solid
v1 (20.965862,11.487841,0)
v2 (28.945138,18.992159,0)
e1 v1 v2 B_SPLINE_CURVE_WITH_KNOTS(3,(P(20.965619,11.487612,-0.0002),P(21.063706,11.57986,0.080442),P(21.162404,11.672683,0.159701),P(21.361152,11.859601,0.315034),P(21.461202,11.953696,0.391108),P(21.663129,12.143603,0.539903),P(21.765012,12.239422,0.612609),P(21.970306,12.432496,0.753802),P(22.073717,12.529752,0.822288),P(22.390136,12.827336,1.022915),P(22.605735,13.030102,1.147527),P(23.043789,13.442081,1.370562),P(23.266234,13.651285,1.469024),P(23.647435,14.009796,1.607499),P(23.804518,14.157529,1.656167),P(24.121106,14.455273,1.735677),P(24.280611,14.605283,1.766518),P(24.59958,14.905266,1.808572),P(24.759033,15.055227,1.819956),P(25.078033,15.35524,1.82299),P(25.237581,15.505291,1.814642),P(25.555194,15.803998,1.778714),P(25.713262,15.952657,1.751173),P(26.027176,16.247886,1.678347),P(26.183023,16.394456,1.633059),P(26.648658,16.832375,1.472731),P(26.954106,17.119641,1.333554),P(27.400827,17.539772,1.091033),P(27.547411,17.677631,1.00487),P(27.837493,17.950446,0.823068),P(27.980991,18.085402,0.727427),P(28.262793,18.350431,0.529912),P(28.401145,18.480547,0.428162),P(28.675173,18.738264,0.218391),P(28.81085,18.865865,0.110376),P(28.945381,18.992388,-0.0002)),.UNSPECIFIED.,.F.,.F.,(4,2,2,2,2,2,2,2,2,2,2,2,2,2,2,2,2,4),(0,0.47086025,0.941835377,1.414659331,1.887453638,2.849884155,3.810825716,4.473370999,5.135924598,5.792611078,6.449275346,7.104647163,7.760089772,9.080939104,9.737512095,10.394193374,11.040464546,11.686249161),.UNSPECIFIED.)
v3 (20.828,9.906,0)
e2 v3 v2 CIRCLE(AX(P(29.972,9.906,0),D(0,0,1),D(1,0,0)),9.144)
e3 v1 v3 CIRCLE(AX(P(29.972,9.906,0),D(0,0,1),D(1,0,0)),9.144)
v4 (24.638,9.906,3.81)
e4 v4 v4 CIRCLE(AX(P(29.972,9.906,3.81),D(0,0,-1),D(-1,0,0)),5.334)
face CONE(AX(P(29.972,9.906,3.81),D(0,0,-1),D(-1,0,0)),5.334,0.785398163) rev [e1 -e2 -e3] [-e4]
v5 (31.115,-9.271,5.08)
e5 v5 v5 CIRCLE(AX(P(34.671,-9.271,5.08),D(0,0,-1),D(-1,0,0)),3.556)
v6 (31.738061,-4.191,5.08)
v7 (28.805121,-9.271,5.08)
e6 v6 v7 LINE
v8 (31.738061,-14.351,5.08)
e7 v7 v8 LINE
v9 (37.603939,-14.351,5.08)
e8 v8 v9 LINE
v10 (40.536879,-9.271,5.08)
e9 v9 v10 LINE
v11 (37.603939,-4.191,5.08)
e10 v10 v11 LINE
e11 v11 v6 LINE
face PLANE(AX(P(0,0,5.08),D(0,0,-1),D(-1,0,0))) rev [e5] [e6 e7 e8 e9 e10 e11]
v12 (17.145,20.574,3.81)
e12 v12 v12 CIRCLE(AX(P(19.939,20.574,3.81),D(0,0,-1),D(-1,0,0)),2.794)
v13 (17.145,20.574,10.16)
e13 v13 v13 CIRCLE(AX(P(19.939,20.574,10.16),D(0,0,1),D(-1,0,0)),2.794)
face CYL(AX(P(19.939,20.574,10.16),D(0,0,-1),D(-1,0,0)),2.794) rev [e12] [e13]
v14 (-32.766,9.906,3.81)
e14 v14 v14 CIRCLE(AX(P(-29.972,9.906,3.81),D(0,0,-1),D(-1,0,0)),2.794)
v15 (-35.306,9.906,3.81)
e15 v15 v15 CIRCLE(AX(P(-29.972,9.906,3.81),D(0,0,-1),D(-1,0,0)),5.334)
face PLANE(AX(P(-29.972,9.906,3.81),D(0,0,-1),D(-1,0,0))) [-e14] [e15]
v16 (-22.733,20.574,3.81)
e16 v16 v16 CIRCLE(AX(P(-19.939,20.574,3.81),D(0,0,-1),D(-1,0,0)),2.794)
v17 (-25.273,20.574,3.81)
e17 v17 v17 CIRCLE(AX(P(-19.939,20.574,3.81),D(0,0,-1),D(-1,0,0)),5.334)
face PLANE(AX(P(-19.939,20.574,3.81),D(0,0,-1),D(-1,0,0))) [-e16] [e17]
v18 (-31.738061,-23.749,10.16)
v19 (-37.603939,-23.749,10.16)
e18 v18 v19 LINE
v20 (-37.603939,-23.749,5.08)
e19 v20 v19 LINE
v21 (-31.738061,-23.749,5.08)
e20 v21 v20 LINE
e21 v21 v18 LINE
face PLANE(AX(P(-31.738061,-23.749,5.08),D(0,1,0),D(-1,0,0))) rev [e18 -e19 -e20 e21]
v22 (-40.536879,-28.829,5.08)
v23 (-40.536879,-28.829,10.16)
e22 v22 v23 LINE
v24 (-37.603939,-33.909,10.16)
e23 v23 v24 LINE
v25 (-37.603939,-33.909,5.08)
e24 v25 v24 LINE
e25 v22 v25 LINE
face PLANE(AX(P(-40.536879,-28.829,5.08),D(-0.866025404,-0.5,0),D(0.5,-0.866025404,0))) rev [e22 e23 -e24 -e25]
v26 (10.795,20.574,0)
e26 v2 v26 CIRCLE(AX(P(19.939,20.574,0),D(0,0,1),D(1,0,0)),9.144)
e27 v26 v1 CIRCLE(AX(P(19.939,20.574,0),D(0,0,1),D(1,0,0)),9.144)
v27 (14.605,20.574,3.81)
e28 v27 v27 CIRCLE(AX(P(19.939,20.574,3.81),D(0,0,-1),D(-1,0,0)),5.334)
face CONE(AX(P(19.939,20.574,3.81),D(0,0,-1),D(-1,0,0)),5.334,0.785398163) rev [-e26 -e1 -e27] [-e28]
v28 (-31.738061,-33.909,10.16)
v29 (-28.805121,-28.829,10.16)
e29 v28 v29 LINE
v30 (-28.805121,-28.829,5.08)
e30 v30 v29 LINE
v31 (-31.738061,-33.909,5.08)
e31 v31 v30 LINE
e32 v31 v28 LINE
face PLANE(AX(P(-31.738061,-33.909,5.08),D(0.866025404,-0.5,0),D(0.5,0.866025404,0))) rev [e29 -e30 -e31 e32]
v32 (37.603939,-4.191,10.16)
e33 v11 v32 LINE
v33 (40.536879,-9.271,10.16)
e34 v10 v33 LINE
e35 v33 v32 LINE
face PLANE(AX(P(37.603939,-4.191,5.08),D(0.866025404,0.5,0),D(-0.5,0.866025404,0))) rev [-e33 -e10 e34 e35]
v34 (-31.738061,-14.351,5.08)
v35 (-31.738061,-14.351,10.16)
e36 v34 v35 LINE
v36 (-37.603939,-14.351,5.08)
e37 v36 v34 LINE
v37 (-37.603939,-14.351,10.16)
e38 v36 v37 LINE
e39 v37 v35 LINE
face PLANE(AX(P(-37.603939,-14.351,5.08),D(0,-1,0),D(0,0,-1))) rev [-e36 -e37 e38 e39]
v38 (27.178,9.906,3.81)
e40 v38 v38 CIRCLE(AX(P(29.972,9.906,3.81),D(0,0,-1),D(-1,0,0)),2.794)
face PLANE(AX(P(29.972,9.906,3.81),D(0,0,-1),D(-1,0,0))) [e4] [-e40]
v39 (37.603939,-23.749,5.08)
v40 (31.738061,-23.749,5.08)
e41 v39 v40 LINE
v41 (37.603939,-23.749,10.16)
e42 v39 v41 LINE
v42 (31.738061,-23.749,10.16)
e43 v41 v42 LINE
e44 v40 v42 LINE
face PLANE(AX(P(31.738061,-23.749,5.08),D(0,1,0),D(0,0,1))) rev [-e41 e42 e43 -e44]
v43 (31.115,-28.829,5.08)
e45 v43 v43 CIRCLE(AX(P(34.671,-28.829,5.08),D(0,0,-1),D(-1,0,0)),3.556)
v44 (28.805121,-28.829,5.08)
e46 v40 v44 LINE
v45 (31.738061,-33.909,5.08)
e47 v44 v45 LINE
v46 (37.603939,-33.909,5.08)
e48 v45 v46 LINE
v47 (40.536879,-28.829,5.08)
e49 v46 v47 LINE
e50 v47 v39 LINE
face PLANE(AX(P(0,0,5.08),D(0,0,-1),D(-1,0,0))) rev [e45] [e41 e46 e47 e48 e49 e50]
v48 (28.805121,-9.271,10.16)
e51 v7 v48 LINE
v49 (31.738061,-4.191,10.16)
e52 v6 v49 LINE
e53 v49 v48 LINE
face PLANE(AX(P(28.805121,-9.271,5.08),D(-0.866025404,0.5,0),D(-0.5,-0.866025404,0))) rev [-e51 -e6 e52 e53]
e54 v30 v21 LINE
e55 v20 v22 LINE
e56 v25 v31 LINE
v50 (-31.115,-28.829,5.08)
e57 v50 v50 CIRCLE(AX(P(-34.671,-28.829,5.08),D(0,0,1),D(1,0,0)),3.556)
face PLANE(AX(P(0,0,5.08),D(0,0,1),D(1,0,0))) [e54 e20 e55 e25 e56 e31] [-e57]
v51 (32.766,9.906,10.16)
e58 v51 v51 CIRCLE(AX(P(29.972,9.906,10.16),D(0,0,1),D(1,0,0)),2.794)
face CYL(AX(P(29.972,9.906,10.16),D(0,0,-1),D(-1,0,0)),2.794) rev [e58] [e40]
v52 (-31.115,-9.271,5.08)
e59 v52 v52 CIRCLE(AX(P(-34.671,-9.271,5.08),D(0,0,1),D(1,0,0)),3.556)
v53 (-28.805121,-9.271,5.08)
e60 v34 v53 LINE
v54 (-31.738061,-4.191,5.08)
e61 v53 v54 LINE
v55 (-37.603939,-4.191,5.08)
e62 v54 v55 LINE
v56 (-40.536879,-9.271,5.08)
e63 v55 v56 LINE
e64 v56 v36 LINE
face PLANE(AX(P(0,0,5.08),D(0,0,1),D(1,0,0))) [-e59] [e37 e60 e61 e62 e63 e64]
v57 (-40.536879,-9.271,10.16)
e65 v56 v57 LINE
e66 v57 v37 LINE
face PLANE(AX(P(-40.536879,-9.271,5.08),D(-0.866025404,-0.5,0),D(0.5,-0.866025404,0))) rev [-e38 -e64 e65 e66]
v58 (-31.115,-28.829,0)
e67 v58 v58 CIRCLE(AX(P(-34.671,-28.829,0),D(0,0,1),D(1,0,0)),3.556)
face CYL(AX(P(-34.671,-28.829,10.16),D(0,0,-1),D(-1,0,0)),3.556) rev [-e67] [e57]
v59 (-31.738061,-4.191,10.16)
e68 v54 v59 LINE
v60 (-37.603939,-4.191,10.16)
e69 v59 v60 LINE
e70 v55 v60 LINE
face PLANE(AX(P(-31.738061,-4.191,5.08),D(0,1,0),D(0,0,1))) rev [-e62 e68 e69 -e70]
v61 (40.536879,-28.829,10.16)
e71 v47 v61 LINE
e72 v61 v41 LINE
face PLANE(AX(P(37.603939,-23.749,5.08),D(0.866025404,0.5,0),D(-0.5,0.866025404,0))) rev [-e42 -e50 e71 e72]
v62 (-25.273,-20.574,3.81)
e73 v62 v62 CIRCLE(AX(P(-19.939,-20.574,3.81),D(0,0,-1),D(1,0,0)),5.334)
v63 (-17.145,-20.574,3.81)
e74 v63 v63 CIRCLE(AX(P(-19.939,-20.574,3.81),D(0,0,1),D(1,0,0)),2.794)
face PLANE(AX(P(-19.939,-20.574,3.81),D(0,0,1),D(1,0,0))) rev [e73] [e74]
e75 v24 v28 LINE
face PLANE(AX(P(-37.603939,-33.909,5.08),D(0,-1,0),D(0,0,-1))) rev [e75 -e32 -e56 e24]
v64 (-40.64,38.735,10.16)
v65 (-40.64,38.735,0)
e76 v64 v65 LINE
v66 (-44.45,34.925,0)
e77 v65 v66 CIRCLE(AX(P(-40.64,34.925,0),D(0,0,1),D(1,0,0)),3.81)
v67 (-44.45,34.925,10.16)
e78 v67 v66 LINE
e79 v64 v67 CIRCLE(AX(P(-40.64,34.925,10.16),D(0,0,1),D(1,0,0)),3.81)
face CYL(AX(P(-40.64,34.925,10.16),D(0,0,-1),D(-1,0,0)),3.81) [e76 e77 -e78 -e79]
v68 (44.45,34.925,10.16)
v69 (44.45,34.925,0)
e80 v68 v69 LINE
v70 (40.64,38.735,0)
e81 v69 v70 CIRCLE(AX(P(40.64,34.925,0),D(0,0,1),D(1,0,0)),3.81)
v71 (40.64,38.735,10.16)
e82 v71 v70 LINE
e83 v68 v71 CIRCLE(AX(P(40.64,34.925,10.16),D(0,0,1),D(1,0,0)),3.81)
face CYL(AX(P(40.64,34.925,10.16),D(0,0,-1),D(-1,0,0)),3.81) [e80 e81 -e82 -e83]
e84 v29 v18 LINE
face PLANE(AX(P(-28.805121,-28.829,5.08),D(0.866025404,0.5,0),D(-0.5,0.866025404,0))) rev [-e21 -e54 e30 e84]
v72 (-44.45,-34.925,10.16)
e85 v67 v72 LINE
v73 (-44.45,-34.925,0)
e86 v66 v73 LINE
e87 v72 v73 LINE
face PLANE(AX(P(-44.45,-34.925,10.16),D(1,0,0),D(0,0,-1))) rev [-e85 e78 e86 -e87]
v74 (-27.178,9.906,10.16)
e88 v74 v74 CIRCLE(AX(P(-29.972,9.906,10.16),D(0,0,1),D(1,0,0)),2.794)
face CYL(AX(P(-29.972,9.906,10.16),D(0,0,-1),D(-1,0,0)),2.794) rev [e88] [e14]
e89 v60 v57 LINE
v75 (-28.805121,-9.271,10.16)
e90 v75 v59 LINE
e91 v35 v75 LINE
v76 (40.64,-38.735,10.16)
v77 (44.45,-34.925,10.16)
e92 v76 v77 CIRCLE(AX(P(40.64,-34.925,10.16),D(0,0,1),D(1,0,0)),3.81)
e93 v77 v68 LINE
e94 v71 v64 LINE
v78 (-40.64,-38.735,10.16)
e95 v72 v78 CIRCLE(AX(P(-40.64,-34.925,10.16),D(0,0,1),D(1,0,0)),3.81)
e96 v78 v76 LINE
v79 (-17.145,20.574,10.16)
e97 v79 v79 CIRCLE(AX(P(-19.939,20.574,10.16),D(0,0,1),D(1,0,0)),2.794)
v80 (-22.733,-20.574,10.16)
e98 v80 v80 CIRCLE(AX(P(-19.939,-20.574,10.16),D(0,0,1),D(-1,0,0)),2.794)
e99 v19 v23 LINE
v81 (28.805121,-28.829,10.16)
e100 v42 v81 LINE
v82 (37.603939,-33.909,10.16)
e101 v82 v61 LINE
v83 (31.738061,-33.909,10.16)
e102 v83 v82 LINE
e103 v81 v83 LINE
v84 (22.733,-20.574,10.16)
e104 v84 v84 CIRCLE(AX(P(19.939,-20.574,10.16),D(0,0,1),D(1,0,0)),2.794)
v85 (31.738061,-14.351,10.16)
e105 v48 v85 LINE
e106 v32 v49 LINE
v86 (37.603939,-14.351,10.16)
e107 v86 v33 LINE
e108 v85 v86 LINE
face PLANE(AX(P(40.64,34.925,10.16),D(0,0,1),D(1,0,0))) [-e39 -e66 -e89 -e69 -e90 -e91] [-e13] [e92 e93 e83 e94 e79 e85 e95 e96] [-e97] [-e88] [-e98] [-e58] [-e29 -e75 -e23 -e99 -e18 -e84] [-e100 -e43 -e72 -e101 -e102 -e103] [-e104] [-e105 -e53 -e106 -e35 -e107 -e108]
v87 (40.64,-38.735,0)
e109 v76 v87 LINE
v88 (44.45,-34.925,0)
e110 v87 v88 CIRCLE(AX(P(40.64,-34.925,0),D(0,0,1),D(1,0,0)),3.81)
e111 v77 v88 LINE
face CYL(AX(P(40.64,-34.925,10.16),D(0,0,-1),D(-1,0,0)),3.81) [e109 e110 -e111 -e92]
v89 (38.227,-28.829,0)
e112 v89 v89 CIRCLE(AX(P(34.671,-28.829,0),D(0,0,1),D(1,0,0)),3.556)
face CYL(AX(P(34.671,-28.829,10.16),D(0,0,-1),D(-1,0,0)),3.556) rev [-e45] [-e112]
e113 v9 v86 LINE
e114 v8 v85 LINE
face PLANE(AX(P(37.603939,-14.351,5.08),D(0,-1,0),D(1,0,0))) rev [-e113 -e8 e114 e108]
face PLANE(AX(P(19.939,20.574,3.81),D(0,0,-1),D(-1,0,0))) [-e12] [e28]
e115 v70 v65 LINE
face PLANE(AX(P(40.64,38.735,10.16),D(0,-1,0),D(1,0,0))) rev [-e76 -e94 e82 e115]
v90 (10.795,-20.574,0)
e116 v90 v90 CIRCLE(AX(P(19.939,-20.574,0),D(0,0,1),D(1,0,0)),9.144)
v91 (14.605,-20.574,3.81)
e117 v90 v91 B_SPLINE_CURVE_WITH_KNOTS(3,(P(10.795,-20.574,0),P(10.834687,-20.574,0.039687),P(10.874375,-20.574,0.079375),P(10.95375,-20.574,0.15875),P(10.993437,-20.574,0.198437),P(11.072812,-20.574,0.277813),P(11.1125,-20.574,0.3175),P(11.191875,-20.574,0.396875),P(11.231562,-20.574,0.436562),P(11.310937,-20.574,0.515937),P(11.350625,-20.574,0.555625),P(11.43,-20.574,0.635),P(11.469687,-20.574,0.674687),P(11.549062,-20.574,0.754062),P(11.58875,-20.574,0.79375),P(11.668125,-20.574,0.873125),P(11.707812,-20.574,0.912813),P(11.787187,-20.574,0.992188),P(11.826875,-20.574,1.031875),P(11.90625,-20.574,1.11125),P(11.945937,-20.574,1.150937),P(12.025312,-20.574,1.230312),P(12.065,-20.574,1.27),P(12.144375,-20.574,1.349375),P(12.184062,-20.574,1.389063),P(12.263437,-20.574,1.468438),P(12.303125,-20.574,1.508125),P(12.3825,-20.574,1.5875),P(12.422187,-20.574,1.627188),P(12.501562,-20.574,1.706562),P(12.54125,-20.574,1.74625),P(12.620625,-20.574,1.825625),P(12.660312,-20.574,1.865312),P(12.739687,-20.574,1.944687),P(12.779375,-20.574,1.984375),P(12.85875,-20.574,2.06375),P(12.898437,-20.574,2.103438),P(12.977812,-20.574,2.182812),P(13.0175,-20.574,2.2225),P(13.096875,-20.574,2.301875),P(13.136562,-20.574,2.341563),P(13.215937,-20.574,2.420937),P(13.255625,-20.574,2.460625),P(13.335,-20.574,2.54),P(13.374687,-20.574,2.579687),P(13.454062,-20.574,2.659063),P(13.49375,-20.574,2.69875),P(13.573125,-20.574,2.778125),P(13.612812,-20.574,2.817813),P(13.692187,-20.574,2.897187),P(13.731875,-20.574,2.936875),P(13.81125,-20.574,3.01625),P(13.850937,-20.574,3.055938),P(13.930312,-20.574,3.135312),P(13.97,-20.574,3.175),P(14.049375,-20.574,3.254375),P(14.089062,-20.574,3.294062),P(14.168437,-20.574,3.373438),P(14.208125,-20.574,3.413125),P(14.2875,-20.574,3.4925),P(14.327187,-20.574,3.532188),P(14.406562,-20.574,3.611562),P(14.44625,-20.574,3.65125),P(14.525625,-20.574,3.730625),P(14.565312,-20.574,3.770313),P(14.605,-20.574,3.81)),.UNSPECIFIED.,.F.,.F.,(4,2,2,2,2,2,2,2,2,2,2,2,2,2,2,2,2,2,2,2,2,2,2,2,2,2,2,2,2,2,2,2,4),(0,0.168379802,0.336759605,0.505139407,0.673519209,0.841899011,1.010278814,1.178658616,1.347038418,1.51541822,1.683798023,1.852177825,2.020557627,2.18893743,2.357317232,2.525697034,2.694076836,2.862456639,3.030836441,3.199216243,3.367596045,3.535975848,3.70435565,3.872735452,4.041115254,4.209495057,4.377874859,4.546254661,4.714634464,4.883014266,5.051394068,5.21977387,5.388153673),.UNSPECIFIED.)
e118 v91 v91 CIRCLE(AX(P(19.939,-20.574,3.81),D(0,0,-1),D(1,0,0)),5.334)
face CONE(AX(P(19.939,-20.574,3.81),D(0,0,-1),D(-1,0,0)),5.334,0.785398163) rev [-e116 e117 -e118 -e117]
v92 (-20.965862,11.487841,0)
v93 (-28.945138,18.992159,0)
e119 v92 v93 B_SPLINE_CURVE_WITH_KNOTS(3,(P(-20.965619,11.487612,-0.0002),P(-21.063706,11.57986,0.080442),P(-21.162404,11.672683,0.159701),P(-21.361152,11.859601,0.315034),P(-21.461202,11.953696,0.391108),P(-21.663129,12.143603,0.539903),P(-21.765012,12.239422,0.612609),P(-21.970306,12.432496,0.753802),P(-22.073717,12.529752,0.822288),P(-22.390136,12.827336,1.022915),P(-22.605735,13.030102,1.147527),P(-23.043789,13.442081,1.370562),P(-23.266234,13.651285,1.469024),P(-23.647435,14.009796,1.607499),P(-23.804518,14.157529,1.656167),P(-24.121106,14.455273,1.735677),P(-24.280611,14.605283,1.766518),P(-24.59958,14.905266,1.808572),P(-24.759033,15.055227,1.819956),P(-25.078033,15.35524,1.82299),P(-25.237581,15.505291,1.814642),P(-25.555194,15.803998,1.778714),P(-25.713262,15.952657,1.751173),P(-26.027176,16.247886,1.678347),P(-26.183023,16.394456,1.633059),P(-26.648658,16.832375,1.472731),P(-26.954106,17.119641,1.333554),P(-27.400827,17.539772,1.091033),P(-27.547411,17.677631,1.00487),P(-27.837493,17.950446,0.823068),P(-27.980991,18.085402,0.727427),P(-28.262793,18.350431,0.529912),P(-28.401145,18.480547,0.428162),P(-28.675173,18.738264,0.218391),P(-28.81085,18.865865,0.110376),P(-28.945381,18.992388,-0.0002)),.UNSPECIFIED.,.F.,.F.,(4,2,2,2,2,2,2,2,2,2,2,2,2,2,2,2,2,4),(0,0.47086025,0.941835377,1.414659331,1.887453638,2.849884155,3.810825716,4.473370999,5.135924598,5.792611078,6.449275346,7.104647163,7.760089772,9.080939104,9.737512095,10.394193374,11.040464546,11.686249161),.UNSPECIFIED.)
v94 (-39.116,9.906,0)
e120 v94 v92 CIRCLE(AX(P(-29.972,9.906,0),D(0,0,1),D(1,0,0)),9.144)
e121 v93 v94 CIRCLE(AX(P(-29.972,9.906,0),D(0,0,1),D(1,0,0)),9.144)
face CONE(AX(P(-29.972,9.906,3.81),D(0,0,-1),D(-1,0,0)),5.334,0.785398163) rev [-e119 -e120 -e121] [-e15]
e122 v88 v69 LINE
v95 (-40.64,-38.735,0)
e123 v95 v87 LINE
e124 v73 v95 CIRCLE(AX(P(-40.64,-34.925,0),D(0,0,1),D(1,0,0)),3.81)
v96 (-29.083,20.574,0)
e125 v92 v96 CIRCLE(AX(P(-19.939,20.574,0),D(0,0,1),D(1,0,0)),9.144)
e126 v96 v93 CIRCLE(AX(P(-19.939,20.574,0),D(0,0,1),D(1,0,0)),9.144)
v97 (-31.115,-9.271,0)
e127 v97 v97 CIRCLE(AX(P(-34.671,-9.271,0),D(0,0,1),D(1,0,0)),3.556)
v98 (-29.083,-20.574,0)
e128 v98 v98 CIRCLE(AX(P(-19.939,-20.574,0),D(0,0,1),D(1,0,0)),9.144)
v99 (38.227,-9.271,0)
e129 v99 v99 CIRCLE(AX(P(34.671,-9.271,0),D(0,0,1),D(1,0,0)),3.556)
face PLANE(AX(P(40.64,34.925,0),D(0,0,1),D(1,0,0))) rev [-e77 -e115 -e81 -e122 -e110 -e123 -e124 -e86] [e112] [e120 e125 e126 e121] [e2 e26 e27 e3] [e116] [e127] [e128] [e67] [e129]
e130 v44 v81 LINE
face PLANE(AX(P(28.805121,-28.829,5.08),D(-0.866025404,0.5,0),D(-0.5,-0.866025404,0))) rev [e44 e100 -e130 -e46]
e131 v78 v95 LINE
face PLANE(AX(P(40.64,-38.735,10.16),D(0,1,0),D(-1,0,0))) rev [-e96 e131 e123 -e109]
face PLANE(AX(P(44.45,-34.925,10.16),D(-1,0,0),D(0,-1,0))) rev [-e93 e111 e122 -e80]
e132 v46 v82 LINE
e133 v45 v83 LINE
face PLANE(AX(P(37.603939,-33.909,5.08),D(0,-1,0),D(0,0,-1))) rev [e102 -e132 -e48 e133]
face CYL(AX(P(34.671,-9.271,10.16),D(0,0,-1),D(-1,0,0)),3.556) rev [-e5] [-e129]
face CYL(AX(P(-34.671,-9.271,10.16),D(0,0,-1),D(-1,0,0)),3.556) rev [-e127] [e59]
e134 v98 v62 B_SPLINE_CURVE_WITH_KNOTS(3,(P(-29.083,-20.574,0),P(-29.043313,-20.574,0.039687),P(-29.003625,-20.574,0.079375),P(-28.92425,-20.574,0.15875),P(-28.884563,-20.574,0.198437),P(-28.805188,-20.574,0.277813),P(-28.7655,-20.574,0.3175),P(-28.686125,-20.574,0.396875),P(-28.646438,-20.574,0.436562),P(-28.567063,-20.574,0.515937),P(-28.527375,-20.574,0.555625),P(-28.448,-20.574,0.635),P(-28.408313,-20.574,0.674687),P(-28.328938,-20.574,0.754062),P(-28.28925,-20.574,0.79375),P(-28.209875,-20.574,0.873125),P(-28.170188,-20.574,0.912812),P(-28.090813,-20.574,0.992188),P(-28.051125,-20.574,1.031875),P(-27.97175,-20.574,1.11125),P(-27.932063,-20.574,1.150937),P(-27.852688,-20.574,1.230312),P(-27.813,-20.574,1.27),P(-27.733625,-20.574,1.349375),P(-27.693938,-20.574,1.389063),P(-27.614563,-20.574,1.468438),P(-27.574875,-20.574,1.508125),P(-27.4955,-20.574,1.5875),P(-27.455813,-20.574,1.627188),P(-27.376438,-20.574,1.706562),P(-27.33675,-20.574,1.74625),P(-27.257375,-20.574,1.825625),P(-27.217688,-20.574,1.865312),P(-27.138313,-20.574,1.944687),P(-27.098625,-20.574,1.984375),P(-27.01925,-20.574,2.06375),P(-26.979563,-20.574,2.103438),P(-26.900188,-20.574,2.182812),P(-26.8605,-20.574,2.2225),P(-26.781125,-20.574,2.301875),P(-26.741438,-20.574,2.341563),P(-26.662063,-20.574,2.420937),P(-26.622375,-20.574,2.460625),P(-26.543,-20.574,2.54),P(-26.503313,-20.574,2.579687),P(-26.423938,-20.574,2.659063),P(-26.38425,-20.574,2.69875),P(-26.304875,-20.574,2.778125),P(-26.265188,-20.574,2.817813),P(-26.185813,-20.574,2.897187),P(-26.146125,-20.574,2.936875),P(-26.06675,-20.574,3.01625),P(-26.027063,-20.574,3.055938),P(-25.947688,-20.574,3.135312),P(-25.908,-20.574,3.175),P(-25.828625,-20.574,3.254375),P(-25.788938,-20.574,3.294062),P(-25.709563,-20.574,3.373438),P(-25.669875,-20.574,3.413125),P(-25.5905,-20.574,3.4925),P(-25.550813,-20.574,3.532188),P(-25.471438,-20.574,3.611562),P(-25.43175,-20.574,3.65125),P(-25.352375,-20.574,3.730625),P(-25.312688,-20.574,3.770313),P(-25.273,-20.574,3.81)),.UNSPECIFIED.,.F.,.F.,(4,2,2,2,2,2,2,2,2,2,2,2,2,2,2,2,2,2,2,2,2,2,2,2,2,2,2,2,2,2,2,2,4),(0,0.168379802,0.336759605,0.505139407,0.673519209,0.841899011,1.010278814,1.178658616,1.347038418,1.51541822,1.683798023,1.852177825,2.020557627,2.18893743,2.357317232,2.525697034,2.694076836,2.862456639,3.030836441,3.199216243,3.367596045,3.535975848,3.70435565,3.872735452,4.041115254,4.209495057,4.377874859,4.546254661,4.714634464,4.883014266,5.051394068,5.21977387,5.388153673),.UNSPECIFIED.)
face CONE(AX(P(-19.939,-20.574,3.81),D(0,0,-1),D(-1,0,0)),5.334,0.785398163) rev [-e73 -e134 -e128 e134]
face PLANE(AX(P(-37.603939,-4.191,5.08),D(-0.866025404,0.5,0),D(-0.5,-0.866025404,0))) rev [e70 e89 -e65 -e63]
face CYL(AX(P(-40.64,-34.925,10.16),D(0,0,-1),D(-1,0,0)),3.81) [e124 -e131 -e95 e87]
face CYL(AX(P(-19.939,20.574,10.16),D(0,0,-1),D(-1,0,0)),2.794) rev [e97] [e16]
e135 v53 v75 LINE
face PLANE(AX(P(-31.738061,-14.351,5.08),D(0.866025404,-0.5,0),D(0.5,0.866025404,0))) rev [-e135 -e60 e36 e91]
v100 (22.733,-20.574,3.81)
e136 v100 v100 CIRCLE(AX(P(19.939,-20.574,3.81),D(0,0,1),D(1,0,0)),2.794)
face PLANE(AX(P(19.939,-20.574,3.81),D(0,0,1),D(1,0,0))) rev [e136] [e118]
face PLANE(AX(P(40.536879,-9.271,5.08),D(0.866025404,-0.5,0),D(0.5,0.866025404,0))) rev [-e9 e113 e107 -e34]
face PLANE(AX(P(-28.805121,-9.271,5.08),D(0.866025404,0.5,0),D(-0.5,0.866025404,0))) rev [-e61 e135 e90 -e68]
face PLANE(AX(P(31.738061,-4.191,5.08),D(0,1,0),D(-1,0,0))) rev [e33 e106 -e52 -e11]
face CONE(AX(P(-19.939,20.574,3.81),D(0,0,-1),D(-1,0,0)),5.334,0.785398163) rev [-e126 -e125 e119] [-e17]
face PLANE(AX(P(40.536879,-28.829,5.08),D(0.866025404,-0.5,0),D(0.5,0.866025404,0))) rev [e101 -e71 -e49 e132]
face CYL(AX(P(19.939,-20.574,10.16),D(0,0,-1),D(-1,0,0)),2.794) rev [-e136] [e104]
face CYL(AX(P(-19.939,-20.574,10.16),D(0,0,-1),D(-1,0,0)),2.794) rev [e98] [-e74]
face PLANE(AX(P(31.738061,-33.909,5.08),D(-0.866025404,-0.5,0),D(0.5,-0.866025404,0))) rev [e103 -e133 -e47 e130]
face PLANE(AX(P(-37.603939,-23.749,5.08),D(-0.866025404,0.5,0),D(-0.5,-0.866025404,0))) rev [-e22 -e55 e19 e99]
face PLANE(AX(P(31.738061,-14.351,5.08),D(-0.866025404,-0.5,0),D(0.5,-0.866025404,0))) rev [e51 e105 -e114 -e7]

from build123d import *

# Parameters (mm, degrees)
SKETCH1_R           = 3.556
SKETCH1_R_2         = 2.794
BOSS_EXTRUDE1_DEPTH = 10.16
SKETCH2_R           = 5.334
CUT_EXTRUDE1_DEPTH  = 3.81
CUT_EXTRUDE2_DEPTH  = 5.08
CHAMFER1_SIZE       = 3.81


with BuildPart() as part:
    # Sketch1 → Boss-Extrude1 (new body)
    with BuildSketch(Plane.XY):
        with BuildLine():
            Line((40.64, -38.735), (-40.64, -38.735))
            ThreePointArc((-40.64, -38.735), (-43.334076836, -37.619076836), (-44.45, -34.925))
            Line((-44.45, -34.925), (-44.45, 34.925))
            ThreePointArc((-44.45, 34.925), (-43.334076836, 37.619076836), (-40.64, 38.735))
            Line((-40.64, 38.735), (40.64, 38.735))
            ThreePointArc((40.64, 38.735), (43.334076836, 37.619076836), (44.45, 34.925))
            Line((44.45, 34.925), (44.45, -34.925))
            ThreePointArc((44.45, -34.925), (43.334076836, -37.619076836), (40.64, -38.735))
        make_face()
        with Locations((-34.671, -9.271)):
            Circle(SKETCH1_R, mode=Mode.SUBTRACT)
        with Locations((-34.671, -28.829)):
            Circle(SKETCH1_R, mode=Mode.SUBTRACT)
        with Locations((34.671, -9.271)):
            Circle(SKETCH1_R, mode=Mode.SUBTRACT)
        with Locations((34.671, -28.829)):
            Circle(SKETCH1_R, mode=Mode.SUBTRACT)
        with Locations((-19.939, 20.574)):
            Circle(SKETCH1_R_2, mode=Mode.SUBTRACT)
        with Locations(Location((19.939, 20.574, 0), (0, 0, 180))):
            Circle(SKETCH1_R_2, mode=Mode.SUBTRACT)
        with Locations((19.939, -20.574)):
            Circle(SKETCH1_R_2, mode=Mode.SUBTRACT)
        with Locations(Location((-19.939, -20.574, 0), (0, 0, 180))):
            Circle(SKETCH1_R_2, mode=Mode.SUBTRACT)
        with Locations((29.972, 9.906)):
            Circle(SKETCH1_R_2, mode=Mode.SUBTRACT)
        with Locations((-29.972, 9.906)):
            Circle(SKETCH1_R_2, mode=Mode.SUBTRACT)
    extrude(amount=BOSS_EXTRUDE1_DEPTH)

    # Sketch2 → Cut-Extrude1 (cut)
    with BuildSketch(Plane(origin=(0, 0, 0), x_dir=(-1, 0, 0), z_dir=(0, 0, -1))):
        with Locations((-19.939, 20.574)):
            Circle(SKETCH2_R)
        with Locations((19.939, -20.574)):
            Circle(SKETCH2_R)
        with Locations((-19.939, -20.574)):
            Circle(SKETCH2_R)
        with Locations((19.939, 20.574)):
            Circle(SKETCH2_R)
        with Locations((-29.972, 9.906)):
            Circle(SKETCH2_R)
        with Locations((29.972, 9.906)):
            Circle(SKETCH2_R)
    extrude(amount=-CUT_EXTRUDE1_DEPTH, mode=Mode.SUBTRACT)

    # Sketch3 → Cut-Extrude2 (cut)
    with BuildSketch(Plane.XY.offset(10.16)):
        Polygon((-31.738060633, -14.351), (-28.805121265, -9.271), (-31.738060633, -4.191), (-37.603939367, -4.191), (-40.536878735, -9.271), (-37.603939367, -14.351), align=None)
        Polygon((-31.738060633, -33.909), (-28.805121265, -28.829), (-31.738060633, -23.749), (-37.603939367, -23.749), (-40.536878735, -28.829), (-37.603939367, -33.909), align=None)
        Polygon((37.603939367, -33.909), (31.738060633, -33.909), (28.805121265, -28.829), (31.738060633, -23.749), (37.603939367, -23.749), (40.536878735, -28.829), align=None)
        Polygon((37.603939367, -14.351), (31.738060633, -14.351), (28.805121265, -9.271), (31.738060633, -4.191), (37.603939367, -4.191), (40.536878735, -9.271), align=None)
    extrude(amount=-CUT_EXTRUDE2_DEPTH, mode=Mode.SUBTRACT)

    # Chamfer1
    # the kernel refuses this chamfer: 3.81 mm, written as the material it takes off along each edge
    with BuildSketch(Plane(origin=(19.939, 20.574, 0), x_dir=(-1, 0, 0), z_dir=(0, -1, 0))) as chamfer1_piece_1_section:
        Polygon((5.334 + CHAMFER1_SIZE, 0), (5.334, -CHAMFER1_SIZE), (5.334, 0), align=None)
    chamfer1_piece_1 = revolve(axis=Axis((19.939, 20.574, 0), (0, 0, -1)), mode=Mode.PRIVATE)
    chamfer1_piece_1 = split(chamfer1_piece_1, bisect_by=Plane(origin=(27.18300283, 20.574, 3.81), z_dir=(0, 0, -1)), keep=Keep.TOP, mode=Mode.PRIVATE)
    add(chamfer1_piece_1, mode=Mode.SUBTRACT)
    with BuildSketch(Plane(origin=(-19.939, 20.574, 0), x_dir=(-1, 0, 0), z_dir=(0, -1, 0))) as chamfer1_piece_2_section:
        Polygon((5.334 + CHAMFER1_SIZE, 0), (5.334, -CHAMFER1_SIZE), (5.334, 0), align=None)
    chamfer1_piece_2 = revolve(axis=Axis((-19.939, 20.574, 0), (0, 0, -1)), mode=Mode.PRIVATE)
    chamfer1_piece_2 = split(chamfer1_piece_2, bisect_by=Plane(origin=(-12.694997174, 20.574, 3.81), z_dir=(0, 0, -1)), keep=Keep.TOP, mode=Mode.PRIVATE)
    add(chamfer1_piece_2, mode=Mode.SUBTRACT)
    with BuildSketch(Plane(origin=(-19.939, -20.574, 0), x_dir=(-1, 0, 0), z_dir=(0, -1, 0))) as chamfer1_piece_3_section:
        Polygon((5.334 + CHAMFER1_SIZE, 0), (5.334, -CHAMFER1_SIZE), (5.334, 0), align=None)
    chamfer1_piece_3 = revolve(axis=Axis((-19.939, -20.574, 0), (0, 0, -1)), mode=Mode.PRIVATE)
    chamfer1_piece_3 = split(chamfer1_piece_3, bisect_by=Plane(origin=(-12.694997169, -20.574, 3.81), z_dir=(0, 0, -1)), keep=Keep.TOP, mode=Mode.PRIVATE)
    add(chamfer1_piece_3, mode=Mode.SUBTRACT)
    with BuildSketch(Plane(origin=(19.939, -20.574, 0), x_dir=(-1, 0, 0), z_dir=(0, -1, 0))) as chamfer1_piece_4_section:
        Polygon((5.334 + CHAMFER1_SIZE, 0), (5.334, -CHAMFER1_SIZE), (5.334, 0), align=None)
    chamfer1_piece_4 = revolve(axis=Axis((19.939, -20.574, 0), (0, 0, -1)), mode=Mode.PRIVATE)
    chamfer1_piece_4 = split(chamfer1_piece_4, bisect_by=Plane(origin=(27.183002828, -20.574, 3.81), z_dir=(0, 0, -1)), keep=Keep.TOP, mode=Mode.PRIVATE)
    add(chamfer1_piece_4, mode=Mode.SUBTRACT)
    with BuildSketch(Plane(origin=(29.972, 9.906, 0), x_dir=(-1, 0, 0), z_dir=(0, -1, 0))) as chamfer1_piece_5_section:
        Polygon((5.334 + CHAMFER1_SIZE, 0), (5.334, -CHAMFER1_SIZE), (5.334, 0), align=None)
    chamfer1_piece_5 = revolve(axis=Axis((29.972, 9.906, 0), (0, 0, -1)), mode=Mode.PRIVATE)
    chamfer1_piece_5 = split(chamfer1_piece_5, bisect_by=Plane(origin=(37.216002826, 9.906, 3.81), z_dir=(0, 0, -1)), keep=Keep.TOP, mode=Mode.PRIVATE)
    add(chamfer1_piece_5, mode=Mode.SUBTRACT)
    with BuildSketch(Plane(origin=(-29.972, 9.906, 0), x_dir=(-1, 0, 0), z_dir=(0, -1, 0))) as chamfer1_piece_6_section:
        Polygon((5.334 + CHAMFER1_SIZE, 0), (5.334, -CHAMFER1_SIZE), (5.334, 0), align=None)
    chamfer1_piece_6 = revolve(axis=Axis((-29.972, 9.906, 0), (0, 0, -1)), mode=Mode.PRIVATE)
    chamfer1_piece_6 = split(chamfer1_piece_6, bisect_by=Plane(origin=(-22.727997169, 9.906, 3.81), z_dir=(0, 0, -1)), keep=Keep.TOP, mode=Mode.PRIVATE)
    add(chamfer1_piece_6, mode=Mode.SUBTRACT)


solid = part.part
